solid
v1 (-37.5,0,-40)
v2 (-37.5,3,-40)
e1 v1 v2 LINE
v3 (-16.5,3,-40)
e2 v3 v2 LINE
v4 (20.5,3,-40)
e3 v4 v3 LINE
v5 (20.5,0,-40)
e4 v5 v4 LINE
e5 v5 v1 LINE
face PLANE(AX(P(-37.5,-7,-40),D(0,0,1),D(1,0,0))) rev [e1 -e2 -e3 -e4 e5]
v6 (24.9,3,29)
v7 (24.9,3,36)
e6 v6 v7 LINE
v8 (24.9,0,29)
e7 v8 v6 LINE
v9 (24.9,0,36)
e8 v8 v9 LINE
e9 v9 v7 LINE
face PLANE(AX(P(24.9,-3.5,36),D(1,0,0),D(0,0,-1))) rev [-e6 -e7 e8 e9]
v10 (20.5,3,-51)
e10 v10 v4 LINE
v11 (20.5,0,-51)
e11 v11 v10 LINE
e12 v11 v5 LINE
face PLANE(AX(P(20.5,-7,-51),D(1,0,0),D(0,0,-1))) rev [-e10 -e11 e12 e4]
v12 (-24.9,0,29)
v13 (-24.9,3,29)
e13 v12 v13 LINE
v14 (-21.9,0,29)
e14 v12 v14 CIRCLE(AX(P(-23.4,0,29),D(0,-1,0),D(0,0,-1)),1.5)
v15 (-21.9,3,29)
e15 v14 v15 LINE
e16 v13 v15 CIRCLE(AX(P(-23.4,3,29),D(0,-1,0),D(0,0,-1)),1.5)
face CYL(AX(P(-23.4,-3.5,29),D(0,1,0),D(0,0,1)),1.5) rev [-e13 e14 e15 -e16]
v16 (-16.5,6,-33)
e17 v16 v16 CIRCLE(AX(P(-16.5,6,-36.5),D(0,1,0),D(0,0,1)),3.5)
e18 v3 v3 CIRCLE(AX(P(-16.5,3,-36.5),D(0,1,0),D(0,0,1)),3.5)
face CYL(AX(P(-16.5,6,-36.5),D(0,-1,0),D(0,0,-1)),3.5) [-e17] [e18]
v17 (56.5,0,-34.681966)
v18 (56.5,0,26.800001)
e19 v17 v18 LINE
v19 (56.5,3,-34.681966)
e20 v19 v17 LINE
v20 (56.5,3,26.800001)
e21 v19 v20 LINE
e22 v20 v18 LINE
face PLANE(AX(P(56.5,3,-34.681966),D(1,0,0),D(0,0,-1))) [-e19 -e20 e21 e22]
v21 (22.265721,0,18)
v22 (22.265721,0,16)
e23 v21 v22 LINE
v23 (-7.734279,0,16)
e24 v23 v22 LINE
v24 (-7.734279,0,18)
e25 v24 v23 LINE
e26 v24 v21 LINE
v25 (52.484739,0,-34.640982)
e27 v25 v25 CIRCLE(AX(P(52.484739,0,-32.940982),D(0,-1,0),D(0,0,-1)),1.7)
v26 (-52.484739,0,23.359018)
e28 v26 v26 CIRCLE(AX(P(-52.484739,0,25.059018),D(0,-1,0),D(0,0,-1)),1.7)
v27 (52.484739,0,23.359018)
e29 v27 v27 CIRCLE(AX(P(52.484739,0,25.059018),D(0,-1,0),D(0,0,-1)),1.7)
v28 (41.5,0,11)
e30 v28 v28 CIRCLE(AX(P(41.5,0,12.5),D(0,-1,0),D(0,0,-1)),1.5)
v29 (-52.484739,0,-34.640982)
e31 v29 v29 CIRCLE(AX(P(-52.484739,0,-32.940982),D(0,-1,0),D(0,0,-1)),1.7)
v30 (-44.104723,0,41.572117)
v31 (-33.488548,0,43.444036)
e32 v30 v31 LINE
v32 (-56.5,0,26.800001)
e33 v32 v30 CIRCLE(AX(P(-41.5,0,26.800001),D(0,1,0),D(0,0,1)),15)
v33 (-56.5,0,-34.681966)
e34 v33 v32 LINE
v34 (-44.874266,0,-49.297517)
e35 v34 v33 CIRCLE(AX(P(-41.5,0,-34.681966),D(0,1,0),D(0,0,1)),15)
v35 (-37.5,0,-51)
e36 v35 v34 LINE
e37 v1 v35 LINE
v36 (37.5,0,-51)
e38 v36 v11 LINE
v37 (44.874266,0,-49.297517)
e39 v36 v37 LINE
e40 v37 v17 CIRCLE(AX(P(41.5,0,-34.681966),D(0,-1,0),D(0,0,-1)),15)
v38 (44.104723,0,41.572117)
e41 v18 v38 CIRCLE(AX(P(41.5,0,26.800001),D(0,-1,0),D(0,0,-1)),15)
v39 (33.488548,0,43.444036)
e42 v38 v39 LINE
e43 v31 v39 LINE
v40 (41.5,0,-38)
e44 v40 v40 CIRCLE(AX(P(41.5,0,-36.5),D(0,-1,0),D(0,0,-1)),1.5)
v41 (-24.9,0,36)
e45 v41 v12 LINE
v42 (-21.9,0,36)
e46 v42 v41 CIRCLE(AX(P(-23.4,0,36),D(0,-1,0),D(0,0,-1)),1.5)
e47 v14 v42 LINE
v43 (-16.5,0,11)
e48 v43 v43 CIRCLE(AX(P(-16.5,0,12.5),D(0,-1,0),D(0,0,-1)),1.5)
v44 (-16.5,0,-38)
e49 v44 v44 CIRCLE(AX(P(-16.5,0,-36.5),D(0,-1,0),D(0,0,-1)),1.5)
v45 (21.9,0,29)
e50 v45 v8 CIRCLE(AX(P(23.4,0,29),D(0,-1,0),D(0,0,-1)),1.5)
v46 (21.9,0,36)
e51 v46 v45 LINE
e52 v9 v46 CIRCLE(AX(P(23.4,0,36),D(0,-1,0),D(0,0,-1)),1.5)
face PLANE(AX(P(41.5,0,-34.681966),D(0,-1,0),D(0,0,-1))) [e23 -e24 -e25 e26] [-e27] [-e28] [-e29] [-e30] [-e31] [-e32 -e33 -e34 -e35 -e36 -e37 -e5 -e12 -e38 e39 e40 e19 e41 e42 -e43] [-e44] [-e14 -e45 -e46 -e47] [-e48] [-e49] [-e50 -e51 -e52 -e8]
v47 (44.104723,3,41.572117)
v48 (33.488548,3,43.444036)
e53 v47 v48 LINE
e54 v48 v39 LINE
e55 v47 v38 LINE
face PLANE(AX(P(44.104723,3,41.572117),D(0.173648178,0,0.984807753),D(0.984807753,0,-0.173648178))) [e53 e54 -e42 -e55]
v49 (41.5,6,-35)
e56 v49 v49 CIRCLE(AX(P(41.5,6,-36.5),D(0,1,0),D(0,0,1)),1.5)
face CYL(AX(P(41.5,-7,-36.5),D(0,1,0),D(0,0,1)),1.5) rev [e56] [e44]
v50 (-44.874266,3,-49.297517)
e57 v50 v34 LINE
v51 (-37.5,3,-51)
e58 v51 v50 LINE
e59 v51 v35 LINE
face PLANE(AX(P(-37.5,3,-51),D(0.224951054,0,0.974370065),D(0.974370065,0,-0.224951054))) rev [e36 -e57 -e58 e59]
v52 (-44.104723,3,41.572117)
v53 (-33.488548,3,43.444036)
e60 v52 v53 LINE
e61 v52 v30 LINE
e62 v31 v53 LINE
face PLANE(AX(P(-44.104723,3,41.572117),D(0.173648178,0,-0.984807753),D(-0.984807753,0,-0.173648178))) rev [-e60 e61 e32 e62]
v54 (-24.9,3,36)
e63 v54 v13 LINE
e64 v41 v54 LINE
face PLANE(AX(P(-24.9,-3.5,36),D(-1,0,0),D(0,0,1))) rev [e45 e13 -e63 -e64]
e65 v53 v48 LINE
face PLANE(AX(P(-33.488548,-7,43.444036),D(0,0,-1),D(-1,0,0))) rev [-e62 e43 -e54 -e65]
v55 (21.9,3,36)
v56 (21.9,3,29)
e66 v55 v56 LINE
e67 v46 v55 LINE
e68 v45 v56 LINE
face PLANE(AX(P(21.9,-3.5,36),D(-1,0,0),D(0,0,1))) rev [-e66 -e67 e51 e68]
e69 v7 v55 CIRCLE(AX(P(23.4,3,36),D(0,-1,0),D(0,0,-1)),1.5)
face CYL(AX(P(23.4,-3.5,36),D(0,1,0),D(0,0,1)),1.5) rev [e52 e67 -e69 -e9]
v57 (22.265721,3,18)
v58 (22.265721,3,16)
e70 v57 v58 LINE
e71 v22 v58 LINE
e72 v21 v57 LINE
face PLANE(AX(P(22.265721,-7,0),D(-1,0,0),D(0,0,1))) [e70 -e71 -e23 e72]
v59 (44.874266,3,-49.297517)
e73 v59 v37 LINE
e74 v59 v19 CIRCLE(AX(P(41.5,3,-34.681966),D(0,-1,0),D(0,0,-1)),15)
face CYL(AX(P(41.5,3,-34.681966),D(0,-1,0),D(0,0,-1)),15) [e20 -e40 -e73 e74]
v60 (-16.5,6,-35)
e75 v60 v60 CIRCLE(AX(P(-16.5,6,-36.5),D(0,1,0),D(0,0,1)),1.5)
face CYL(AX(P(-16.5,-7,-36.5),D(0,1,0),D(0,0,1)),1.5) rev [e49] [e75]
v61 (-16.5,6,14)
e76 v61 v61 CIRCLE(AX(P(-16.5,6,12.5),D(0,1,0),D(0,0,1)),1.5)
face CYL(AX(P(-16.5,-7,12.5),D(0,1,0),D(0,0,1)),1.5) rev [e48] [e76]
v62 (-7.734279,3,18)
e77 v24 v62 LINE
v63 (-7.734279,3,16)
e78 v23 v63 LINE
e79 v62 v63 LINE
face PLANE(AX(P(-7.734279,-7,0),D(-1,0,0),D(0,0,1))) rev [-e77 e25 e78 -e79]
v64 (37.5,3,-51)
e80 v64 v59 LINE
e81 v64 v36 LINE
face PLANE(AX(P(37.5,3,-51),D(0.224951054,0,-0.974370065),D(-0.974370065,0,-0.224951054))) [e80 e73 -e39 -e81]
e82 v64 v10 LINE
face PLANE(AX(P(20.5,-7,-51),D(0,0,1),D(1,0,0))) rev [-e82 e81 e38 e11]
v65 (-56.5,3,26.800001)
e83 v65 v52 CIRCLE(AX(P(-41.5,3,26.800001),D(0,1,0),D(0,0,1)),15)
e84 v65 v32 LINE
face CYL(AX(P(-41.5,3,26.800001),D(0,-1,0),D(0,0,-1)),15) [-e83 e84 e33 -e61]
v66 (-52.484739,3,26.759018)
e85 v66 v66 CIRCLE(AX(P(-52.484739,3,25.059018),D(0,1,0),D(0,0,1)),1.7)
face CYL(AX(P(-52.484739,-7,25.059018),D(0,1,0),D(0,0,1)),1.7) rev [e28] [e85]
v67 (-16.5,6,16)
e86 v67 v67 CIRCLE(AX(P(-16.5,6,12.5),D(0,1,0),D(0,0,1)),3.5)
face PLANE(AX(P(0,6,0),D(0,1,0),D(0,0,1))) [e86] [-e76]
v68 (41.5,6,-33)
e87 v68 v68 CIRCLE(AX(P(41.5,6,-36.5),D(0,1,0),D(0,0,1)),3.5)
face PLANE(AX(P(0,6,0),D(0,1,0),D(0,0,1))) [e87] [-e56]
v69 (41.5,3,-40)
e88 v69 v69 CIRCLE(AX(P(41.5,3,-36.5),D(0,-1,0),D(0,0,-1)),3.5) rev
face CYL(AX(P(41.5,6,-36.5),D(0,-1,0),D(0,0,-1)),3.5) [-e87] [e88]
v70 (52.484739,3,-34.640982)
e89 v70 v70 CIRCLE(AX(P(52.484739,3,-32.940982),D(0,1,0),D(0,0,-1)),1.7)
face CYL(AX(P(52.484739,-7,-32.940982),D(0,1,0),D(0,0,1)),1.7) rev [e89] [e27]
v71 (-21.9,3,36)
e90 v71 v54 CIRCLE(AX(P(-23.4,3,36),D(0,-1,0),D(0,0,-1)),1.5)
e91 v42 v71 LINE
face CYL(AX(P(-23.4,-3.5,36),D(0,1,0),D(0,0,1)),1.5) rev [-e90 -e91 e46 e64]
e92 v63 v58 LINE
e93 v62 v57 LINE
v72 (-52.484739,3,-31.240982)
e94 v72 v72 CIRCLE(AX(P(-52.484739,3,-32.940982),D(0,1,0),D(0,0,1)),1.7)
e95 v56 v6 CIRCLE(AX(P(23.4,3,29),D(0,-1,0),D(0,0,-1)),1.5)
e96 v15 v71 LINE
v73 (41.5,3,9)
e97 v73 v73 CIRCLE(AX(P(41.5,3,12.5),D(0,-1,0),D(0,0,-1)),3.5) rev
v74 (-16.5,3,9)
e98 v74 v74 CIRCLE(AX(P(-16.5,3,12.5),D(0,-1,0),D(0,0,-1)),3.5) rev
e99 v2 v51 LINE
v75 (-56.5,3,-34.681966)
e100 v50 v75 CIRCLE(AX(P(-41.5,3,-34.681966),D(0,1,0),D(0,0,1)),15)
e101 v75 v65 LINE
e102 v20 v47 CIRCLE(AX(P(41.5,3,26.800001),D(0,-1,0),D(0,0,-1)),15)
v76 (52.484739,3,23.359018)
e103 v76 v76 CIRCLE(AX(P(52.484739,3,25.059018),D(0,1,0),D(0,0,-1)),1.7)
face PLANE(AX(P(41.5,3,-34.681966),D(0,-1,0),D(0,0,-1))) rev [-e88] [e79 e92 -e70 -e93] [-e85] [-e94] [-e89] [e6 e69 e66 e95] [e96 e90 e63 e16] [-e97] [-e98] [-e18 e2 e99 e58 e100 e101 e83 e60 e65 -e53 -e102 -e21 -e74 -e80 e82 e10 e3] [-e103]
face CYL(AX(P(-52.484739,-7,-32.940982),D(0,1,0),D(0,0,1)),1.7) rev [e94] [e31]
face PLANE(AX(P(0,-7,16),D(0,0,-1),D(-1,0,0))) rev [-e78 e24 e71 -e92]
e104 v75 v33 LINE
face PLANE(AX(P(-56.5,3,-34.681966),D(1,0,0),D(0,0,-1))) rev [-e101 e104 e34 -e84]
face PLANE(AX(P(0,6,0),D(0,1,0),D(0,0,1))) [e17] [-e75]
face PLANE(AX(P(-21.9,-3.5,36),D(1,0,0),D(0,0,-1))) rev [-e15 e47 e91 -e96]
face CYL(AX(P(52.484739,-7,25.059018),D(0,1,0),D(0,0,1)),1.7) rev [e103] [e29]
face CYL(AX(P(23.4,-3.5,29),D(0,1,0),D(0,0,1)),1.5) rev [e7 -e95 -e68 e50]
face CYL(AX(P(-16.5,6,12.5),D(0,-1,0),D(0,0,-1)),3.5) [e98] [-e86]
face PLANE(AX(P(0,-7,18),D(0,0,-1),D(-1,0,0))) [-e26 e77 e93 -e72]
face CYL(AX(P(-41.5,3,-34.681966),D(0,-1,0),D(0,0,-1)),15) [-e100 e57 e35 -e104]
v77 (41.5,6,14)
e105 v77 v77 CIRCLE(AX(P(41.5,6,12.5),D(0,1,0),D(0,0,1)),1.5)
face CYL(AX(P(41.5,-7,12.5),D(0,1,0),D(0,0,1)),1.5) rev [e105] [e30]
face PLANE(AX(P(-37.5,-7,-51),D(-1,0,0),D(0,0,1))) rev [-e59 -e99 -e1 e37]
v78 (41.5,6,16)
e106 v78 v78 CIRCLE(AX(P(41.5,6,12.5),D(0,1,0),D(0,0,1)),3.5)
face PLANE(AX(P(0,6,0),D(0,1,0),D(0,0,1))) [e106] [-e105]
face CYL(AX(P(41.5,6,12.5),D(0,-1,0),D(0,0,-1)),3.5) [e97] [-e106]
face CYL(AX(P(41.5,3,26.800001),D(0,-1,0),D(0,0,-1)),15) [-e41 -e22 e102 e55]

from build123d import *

# Parameters (mm, degrees)
BOSS_EXTRU_1_DEPTH       = 3
CONG_1_R                 = 20
CONG_2_R                 = 5
BOSS_EXTRU_2_DEPTH       = 5
CONG_4_R                 = 2
CONG_5_R                 = 4
ESQUISSE3_R              = 1.5
ENL_V_MAT_EXTRU_2_DEPTH  = 25
ESQUISSE4_R              = 1.7
ENL_V_MAT_EXTRU_3_DEPTH  = 25
ESQUISSE5_R              = 1.7
ENL_V_MAT_EXTRU_4_DEPTH  = 10
ESQUISSE6_R              = 1.7
ENL_V_MAT_EXTRU_5_DEPTH  = 10
CONG_6_R                 = 10
ENL_V_MAT_EXTRU_8_DEPTH  = 10
ESQUISSE8_R              = 1.5
ESQUISSE8_W              = 30
ESQUISSE8_H              = 2
ENL_V_MAT_EXTRU_10_DEPTH = 10
BOSS_EXTRU_3_START       = 3
ESQUISSE8_3_R            = 3.5
ESQUISSE8_3_R_2          = 1.5
BOSS_EXTRU_3_DEPTH       = 3
ENL_V_MAT_EXTRU_11_DEPTH = 6.5


with BuildPart() as part:
    # Esquisse1 → Boss.-Extru.1 (new body)
    with BuildSketch(Plane(origin=(0, 0, 0), x_dir=(1, 0, 0), z_dir=(0, 1, 0))):
        with BuildLine():
            Line((-37.5, 95), (37.5, 95))
            Line((37.5, 95), (37.5, 51))
            Line((37.5, 51), (44.874265815, 49.29751659))
            ThreePointArc((44.874265815, 49.29751659), (53.239122353, 44.019685168), (56.5, 34.681965619))
            Line((56.5, 34.681965619), (56.5, -26.800001164))
            ThreePointArc((56.5, -26.800001164), (52.990666647, -36.441815309), (44.104722665, -41.572117459))
            Line((44.104722665, -41.572117459), (17, -46.351411369))
            Line((17, -46.351411369), (17, -61.9))
            Line((17, -61.9), (27, -61.9))
            Line((27, -61.9), (27, -66.9))
            Line((27, -66.9), (17, -66.9))
            Line((17, -66.9), (17, -79.1))
            Line((17, -79.1), (27, -79.1))
            Line((27, -79.1), (27, -84.1))
            Line((27, -84.1), (17, -84.1))
            Line((17, -84.1), (17, -95))
            Line((17, -95), (-17, -95))
            Line((-17, -95), (-17, -84.1))
            Line((-17, -84.1), (-27, -84.1))
            Line((-27, -84.1), (-27, -79.1))
            Line((-27, -79.1), (-17, -79.1))
            Line((-17, -79.1), (-17, -66.9))
            Line((-17, -66.9), (-27, -66.9))
            Line((-27, -66.9), (-27, -61.9))
            Line((-27, -61.9), (-17, -61.9))
            Line((-17, -61.9), (-17, -46.351411369))
            Line((-17, -46.351411369), (-44.104722665, -41.572117459))
            ThreePointArc((-44.104722665, -41.572117459), (-52.990666647, -36.441815309), (-56.5, -26.800001164))
            Line((-56.5, -26.800001164), (-56.5, 34.681965619))
            ThreePointArc((-56.5, 34.681965619), (-53.239122353, 44.019685168), (-44.874265815, 49.29751659))
            Line((-44.874265815, 49.29751659), (-37.5, 51))
            Line((-37.5, 51), (-37.5, 95))
        make_face()
    extrude(amount=BOSS_EXTRU_1_DEPTH)

    # Congé1
    # the kernel refuses this fillet: 20 mm, written as the material it adds along each edge
    with BuildSketch(Plane(origin=(17, 0, 46.351411369), x_dir=(0.9848077530122094, 0, -0.1736481776669235), z_dir=(0, 1, 0))) as cong_1_piece_1:
        with BuildLine():
            CenterArc((16.742910017, -20), CONG_1_R, 90, 76.444834731)
            Line((-2.699984081, -15.312370632), (-3.088841963, -15.218618044))
            ThreePointArc((-3.088841963, -15.218618044), (-1.743915142, -7.586726045), (-0.393923101, 0.069459271))
            Line((-0.393923101, 0.069459271), (0, 0.4))
            Line((0, 0.4), (16.742910017, 0.4))
            Line((16.742910017, 0.4), (16.742910017, 0))
        make_face()
    extrude(amount=3)
    with BuildSketch(Plane(origin=(-17, 0, 46.351411369), x_dir=(0, 0, 1), z_dir=(0, 1, 0))) as cong_1_piece_2:
        with BuildLine():
            CenterArc((16.788779247, -19.961511146), CONG_1_R, 93.555165269, 76.444834731)
            Line((-2.907375813, -16.488547593), (-3.301298915, -16.419088322))
            Line((-3.301298915, -16.419088322), (-0.393923101, 0.069459271))
            Line((-0.393923101, 0.069459271), (0, 0.4))
            ThreePointArc((0, 0.4), (7.774294315, 0.4), (15.523784818, 0.399230223))
            Line((15.523784818, 0.399230223), (15.548588631, 0))
        make_face()
    extrude(amount=3)

    # Congé2
    cong_2_edges = [part.edges().sort_by_distance(p)[0] for p in [
        (-17, 1.5, 61.9),
        (17, 1.5, 61.9),
    ]]
    fillet(cong_2_edges, radius=CONG_2_R)

    # Esquisse2 → Boss.-Extru.2 (add)
    with BuildSketch(Plane.XY.offset(84.1)):
        Polygon((-27, 5), (-27, 8.904402326), (-16.833134842, 8.904402326), (-14.427579086, 3), (-14.427579086, 0), (-27, 0), align=None)
        Polygon((16.833134842, 8.904402326), (14.427579086, 3), (14.427579086, 0), (27, 0), (27, 5), (27, 8.904402326), align=None)
    boss_extru_2 = extrude(amount=-BOSS_EXTRU_2_DEPTH)

    # Symétrie1: Boss.-Extru.2 across plane
    add(boss_extru_2.mirror(Plane.XY.offset(73)))

    # Congé4
    cong_4_edges = [part.edges().sort_by_distance(p)[0] for p in [
        (16.833134842, 8.904402326, 81.6),
        (14.427579086, 3, 81.6),
        (-16.833134842, 8.904402326, 81.6),
        (-14.427579086, 3, 81.6),
        (16.833134842, 8.904402326, 64.4),
        (14.427579086, 3, 64.4),
        (-14.427579086, 3, 64.4),
        (-16.833134842, 8.904402326, 64.4),
    ]]
    fillet(cong_4_edges, radius=CONG_4_R)

    # Congé5
    cong_5_edges = [part.edges().sort_by_distance(p)[0] for p in [
        (27, 8.904402326, 81.6),
        (-27, 8.904402326, 81.6),
        (27, 8.904402326, 64.4),
        (-27, 8.904402326, 64.4),
        (-27, 0, 64.4),
        (-27, 0, 81.6),
        (27, 0, 81.6),
        (27, 0, 64.4),
    ]]
    fillet(cong_5_edges, radius=CONG_5_R)

    # Esquisse3 → Enlèv. mat.-Extru.2 (cut)
    with BuildSketch(Plane.XY.offset(84.1)):
        with Locations((-22, 4.452201163)):
            Circle(ESQUISSE3_R)
        with Locations(Location((22, 4.452201163, 0), (0, 0, 284.503100137))):
            Circle(ESQUISSE3_R)
    extrude(amount=-ENL_V_MAT_EXTRU_2_DEPTH, mode=Mode.SUBTRACT)

    # Esquisse4 → Enlèv. mat.-Extru.3 (cut)
    with BuildSketch(Plane(origin=(0, 3, 0), x_dir=(1, 0, 0), z_dir=(0, 1, 0))):
        with Locations(Location((-10, -90.8, 0), (0, 0, 270))):
            Circle(ESQUISSE4_R)
        with Locations(Location((10, -90.8, 0), (0, 0, 270))):
            Circle(ESQUISSE4_R)
        with Locations(Location((8.90673672, -64.828011588, 0), (0, 0, 270))):
            Circle(ESQUISSE4_R)
        with Locations(Location((8.90673672, -81.171988412, 0), (0, 0, 270))):
            Circle(ESQUISSE4_R)
        with Locations(Location((-8.90673672, -81.171988412, 0), (0, 0, 270))):
            Circle(ESQUISSE4_R)
        with Locations(Location((-8.90673672, -64.828011588, 0), (0, 0, 270))):
            Circle(ESQUISSE4_R)
    extrude(amount=-ENL_V_MAT_EXTRU_3_DEPTH, mode=Mode.SUBTRACT)

    # Esquisse5 → Enlèv. mat.-Extru.4 (cut)
    with BuildSketch(Plane(origin=(0, 3, 0), x_dir=(1, 0, 0), z_dir=(0, 1, 0))):
        with Locations(Location((15.5, 83, 0), (0, 0, 270))):
            Circle(ESQUISSE5_R)
        with Locations(Location((15.5, 49, 0), (0, 0, 270))):
            Circle(ESQUISSE5_R)
        with Locations(Location((-13, 83, 0), (0, 0, 270))):
            Circle(ESQUISSE5_R)
        with Locations(Location((-13, 67, 0), (0, 0, 270))):
            Circle(ESQUISSE5_R)
        with Locations(Location((27.5, 80, 0), (0, 0, 270))):
            Circle(ESQUISSE5_R)
        with Locations(Location((27.5, 55, 0), (0, 0, 270))):
            Circle(ESQUISSE5_R)
        with Locations(Location((27.5, 89, 0), (0, 0, 270))):
            Circle(ESQUISSE5_R)
        with Locations(Location((-27.5, 89, 0), (0, 0, 270))):
            Circle(ESQUISSE5_R)
        with Locations(Location((-27.5, 80, 0), (0, 0, 270))):
            Circle(ESQUISSE5_R)
        with Locations(Location((-27.5, 55, 0), (0, 0, 270))):
            Circle(ESQUISSE5_R)
        with Locations(Location((0, 89, 0), (0, 0, 270))):
            Circle(ESQUISSE5_R)
    extrude(amount=-ENL_V_MAT_EXTRU_4_DEPTH, mode=Mode.SUBTRACT)

    # Esquisse6 → Enlèv. mat.-Extru.5 (cut)
    with BuildSketch(Plane(origin=(0, 3, 0), x_dir=(1, 0, 0), z_dir=(0, 1, 0))):
        with Locations(Location((-52.484739006, 32.940982227, 0), (0, 0, 270))):
            Circle(ESQUISSE6_R)
        with Locations(Location((-52.484739006, -25.059017773, 0), (0, 0, 270))):
            Circle(ESQUISSE6_R)
        with Locations(Location((52.484739006, -25.059017773, 0), (0, 0, 90))):
            Circle(ESQUISSE6_R)
        with Locations(Location((52.484739006, 32.940982227, 0), (0, 0, 90))):
            Circle(ESQUISSE6_R)
    extrude(amount=-ENL_V_MAT_EXTRU_5_DEPTH, mode=Mode.SUBTRACT)

    # Congé6
    cong_6_edges = [part.edges().sort_by_distance(p)[0] for p in [
        (37.5, 1.5, -95),
        (-37.5, 1.5, -95),
    ]]
    fillet(cong_6_edges, radius=CONG_6_R)

    # Esquisse7 → Enlèv. mat.-Extru.8 (cut, symmetric)
    with BuildSketch(Plane(origin=(0, 3, 0), x_dir=(1, 0, 0), z_dir=(0, 1, 0))):
        Polygon((-86.454887478, 51), (-37.5, 51), (-37.5, 40), (20.5, 40), (20.5, 51), (91.524772855, 51), (68.271042048, 103.22710764), (-47.050718145, 103.22710764), align=None)
        Polygon((-33.488547593, -43.444035556), (33.488547593, -43.444035556), (53.128015595, -56.162105977), (47.497778975, -107.906661581), (-41.245474419, -107.906661581), (-59.476716808, -77.074413423), align=None)
    extrude(amount=ENL_V_MAT_EXTRU_8_DEPTH, both=True, mode=Mode.SUBTRACT)

    # Esquisse8 → Enlèv. mat.-Extru.10 (cut, symmetric)
    with BuildSketch(Plane(origin=(0, 3, 0), x_dir=(1, 0, 0), z_dir=(0, 1, 0))):
        with Locations(Location((41.5, 36.5, 0), (0, 0, 90))):
            Circle(ESQUISSE8_R)
        with Locations((7.26572134, -17)):
            Rectangle(ESQUISSE8_W, ESQUISSE8_H)
        with Locations(Location((-16.5, -12.5, 0), (0, 0, 90))):
            Circle(ESQUISSE8_R)
        with Locations(Location((-16.5, 36.5, 0), (0, 0, 90))):
            Circle(ESQUISSE8_R)
        with Locations(Location((41.5, -12.5, 0), (0, 0, 90))):
            Circle(ESQUISSE8_R)
    extrude(amount=ENL_V_MAT_EXTRU_10_DEPTH, both=True, mode=Mode.SUBTRACT)

    # Esquisse8<3> → Boss.-Extru.3 (add)
    # profile 1 of 4: a face of its own
    with BuildSketch(Plane(origin=(0, 3, 0), x_dir=(1, 0, 0), z_dir=(0, 1, 0)).offset(BOSS_EXTRU_3_START)):
        with Locations(Location((-16.5, -12.5, 0), (0, 0, 90))):
            Circle(ESQUISSE8_3_R)
        with Locations(Location((-16.5, -12.5, 0), (0, 0, 270))):
            Circle(ESQUISSE8_3_R_2, mode=Mode.SUBTRACT)
    # profile 2 of 4: a face of its own
    with BuildSketch(Plane(origin=(0, 3, 0), x_dir=(1, 0, 0), z_dir=(0, 1, 0)).offset(BOSS_EXTRU_3_START)):
        with Locations(Location((41.5, -12.5, 0), (0, 0, 90))):
            Circle(ESQUISSE8_3_R)
        with Locations(Location((41.5, -12.5, 0), (0, 0, 270))):
            Circle(ESQUISSE8_3_R_2, mode=Mode.SUBTRACT)
    # profile 3 of 4: a face of its own
    with BuildSketch(Plane(origin=(0, 3, 0), x_dir=(1, 0, 0), z_dir=(0, 1, 0)).offset(BOSS_EXTRU_3_START)):
        with Locations(Location((41.5, 36.5, 0), (0, 0, 90))):
            Circle(ESQUISSE8_3_R)
        with Locations(Location((41.5, 36.5, 0), (0, 0, 270))):
            Circle(ESQUISSE8_3_R_2, mode=Mode.SUBTRACT)
    # profile 4 of 4: a face of its own
    with BuildSketch(Plane(origin=(0, 3, 0), x_dir=(1, 0, 0), z_dir=(0, 1, 0)).offset(BOSS_EXTRU_3_START)):
        with Locations(Location((-16.5, 36.5, 0), (0, 0, 90))):
            Circle(ESQUISSE8_3_R)
        with Locations(Location((-16.5, 36.5, 0), (0, 0, 270))):
            Circle(ESQUISSE8_3_R_2, mode=Mode.SUBTRACT)
    extrude(amount=-BOSS_EXTRU_3_DEPTH)

    # Esquisse10 → Enlèv. mat.-Extru.11 (cut, symmetric)
    with BuildSketch(Plane(origin=(0, 3, 0), x_dir=(1, 0, 0), z_dir=(0, 1, 0))):
        with BuildLine():
            Line((-24.9, -36), (-24.9, -29))
            ThreePointArc((-24.9, -29), (-23.4, -27.5), (-21.9, -29))
            Line((-21.9, -29), (-21.9, -36))
            ThreePointArc((-21.9, -36), (-23.4, -37.5), (-24.9, -36))
        make_face()
        with BuildLine():
            Line((24.9, -36), (24.9, -29))
            ThreePointArc((24.9, -29), (23.4, -27.5), (21.9, -29))
            Line((21.9, -29), (21.9, -36))
            ThreePointArc((21.9, -36), (23.4, -37.5), (24.9, -36))
        make_face()
    extrude(amount=ENL_V_MAT_EXTRU_11_DEPTH, both=True, mode=Mode.SUBTRACT)


solid = part.part
